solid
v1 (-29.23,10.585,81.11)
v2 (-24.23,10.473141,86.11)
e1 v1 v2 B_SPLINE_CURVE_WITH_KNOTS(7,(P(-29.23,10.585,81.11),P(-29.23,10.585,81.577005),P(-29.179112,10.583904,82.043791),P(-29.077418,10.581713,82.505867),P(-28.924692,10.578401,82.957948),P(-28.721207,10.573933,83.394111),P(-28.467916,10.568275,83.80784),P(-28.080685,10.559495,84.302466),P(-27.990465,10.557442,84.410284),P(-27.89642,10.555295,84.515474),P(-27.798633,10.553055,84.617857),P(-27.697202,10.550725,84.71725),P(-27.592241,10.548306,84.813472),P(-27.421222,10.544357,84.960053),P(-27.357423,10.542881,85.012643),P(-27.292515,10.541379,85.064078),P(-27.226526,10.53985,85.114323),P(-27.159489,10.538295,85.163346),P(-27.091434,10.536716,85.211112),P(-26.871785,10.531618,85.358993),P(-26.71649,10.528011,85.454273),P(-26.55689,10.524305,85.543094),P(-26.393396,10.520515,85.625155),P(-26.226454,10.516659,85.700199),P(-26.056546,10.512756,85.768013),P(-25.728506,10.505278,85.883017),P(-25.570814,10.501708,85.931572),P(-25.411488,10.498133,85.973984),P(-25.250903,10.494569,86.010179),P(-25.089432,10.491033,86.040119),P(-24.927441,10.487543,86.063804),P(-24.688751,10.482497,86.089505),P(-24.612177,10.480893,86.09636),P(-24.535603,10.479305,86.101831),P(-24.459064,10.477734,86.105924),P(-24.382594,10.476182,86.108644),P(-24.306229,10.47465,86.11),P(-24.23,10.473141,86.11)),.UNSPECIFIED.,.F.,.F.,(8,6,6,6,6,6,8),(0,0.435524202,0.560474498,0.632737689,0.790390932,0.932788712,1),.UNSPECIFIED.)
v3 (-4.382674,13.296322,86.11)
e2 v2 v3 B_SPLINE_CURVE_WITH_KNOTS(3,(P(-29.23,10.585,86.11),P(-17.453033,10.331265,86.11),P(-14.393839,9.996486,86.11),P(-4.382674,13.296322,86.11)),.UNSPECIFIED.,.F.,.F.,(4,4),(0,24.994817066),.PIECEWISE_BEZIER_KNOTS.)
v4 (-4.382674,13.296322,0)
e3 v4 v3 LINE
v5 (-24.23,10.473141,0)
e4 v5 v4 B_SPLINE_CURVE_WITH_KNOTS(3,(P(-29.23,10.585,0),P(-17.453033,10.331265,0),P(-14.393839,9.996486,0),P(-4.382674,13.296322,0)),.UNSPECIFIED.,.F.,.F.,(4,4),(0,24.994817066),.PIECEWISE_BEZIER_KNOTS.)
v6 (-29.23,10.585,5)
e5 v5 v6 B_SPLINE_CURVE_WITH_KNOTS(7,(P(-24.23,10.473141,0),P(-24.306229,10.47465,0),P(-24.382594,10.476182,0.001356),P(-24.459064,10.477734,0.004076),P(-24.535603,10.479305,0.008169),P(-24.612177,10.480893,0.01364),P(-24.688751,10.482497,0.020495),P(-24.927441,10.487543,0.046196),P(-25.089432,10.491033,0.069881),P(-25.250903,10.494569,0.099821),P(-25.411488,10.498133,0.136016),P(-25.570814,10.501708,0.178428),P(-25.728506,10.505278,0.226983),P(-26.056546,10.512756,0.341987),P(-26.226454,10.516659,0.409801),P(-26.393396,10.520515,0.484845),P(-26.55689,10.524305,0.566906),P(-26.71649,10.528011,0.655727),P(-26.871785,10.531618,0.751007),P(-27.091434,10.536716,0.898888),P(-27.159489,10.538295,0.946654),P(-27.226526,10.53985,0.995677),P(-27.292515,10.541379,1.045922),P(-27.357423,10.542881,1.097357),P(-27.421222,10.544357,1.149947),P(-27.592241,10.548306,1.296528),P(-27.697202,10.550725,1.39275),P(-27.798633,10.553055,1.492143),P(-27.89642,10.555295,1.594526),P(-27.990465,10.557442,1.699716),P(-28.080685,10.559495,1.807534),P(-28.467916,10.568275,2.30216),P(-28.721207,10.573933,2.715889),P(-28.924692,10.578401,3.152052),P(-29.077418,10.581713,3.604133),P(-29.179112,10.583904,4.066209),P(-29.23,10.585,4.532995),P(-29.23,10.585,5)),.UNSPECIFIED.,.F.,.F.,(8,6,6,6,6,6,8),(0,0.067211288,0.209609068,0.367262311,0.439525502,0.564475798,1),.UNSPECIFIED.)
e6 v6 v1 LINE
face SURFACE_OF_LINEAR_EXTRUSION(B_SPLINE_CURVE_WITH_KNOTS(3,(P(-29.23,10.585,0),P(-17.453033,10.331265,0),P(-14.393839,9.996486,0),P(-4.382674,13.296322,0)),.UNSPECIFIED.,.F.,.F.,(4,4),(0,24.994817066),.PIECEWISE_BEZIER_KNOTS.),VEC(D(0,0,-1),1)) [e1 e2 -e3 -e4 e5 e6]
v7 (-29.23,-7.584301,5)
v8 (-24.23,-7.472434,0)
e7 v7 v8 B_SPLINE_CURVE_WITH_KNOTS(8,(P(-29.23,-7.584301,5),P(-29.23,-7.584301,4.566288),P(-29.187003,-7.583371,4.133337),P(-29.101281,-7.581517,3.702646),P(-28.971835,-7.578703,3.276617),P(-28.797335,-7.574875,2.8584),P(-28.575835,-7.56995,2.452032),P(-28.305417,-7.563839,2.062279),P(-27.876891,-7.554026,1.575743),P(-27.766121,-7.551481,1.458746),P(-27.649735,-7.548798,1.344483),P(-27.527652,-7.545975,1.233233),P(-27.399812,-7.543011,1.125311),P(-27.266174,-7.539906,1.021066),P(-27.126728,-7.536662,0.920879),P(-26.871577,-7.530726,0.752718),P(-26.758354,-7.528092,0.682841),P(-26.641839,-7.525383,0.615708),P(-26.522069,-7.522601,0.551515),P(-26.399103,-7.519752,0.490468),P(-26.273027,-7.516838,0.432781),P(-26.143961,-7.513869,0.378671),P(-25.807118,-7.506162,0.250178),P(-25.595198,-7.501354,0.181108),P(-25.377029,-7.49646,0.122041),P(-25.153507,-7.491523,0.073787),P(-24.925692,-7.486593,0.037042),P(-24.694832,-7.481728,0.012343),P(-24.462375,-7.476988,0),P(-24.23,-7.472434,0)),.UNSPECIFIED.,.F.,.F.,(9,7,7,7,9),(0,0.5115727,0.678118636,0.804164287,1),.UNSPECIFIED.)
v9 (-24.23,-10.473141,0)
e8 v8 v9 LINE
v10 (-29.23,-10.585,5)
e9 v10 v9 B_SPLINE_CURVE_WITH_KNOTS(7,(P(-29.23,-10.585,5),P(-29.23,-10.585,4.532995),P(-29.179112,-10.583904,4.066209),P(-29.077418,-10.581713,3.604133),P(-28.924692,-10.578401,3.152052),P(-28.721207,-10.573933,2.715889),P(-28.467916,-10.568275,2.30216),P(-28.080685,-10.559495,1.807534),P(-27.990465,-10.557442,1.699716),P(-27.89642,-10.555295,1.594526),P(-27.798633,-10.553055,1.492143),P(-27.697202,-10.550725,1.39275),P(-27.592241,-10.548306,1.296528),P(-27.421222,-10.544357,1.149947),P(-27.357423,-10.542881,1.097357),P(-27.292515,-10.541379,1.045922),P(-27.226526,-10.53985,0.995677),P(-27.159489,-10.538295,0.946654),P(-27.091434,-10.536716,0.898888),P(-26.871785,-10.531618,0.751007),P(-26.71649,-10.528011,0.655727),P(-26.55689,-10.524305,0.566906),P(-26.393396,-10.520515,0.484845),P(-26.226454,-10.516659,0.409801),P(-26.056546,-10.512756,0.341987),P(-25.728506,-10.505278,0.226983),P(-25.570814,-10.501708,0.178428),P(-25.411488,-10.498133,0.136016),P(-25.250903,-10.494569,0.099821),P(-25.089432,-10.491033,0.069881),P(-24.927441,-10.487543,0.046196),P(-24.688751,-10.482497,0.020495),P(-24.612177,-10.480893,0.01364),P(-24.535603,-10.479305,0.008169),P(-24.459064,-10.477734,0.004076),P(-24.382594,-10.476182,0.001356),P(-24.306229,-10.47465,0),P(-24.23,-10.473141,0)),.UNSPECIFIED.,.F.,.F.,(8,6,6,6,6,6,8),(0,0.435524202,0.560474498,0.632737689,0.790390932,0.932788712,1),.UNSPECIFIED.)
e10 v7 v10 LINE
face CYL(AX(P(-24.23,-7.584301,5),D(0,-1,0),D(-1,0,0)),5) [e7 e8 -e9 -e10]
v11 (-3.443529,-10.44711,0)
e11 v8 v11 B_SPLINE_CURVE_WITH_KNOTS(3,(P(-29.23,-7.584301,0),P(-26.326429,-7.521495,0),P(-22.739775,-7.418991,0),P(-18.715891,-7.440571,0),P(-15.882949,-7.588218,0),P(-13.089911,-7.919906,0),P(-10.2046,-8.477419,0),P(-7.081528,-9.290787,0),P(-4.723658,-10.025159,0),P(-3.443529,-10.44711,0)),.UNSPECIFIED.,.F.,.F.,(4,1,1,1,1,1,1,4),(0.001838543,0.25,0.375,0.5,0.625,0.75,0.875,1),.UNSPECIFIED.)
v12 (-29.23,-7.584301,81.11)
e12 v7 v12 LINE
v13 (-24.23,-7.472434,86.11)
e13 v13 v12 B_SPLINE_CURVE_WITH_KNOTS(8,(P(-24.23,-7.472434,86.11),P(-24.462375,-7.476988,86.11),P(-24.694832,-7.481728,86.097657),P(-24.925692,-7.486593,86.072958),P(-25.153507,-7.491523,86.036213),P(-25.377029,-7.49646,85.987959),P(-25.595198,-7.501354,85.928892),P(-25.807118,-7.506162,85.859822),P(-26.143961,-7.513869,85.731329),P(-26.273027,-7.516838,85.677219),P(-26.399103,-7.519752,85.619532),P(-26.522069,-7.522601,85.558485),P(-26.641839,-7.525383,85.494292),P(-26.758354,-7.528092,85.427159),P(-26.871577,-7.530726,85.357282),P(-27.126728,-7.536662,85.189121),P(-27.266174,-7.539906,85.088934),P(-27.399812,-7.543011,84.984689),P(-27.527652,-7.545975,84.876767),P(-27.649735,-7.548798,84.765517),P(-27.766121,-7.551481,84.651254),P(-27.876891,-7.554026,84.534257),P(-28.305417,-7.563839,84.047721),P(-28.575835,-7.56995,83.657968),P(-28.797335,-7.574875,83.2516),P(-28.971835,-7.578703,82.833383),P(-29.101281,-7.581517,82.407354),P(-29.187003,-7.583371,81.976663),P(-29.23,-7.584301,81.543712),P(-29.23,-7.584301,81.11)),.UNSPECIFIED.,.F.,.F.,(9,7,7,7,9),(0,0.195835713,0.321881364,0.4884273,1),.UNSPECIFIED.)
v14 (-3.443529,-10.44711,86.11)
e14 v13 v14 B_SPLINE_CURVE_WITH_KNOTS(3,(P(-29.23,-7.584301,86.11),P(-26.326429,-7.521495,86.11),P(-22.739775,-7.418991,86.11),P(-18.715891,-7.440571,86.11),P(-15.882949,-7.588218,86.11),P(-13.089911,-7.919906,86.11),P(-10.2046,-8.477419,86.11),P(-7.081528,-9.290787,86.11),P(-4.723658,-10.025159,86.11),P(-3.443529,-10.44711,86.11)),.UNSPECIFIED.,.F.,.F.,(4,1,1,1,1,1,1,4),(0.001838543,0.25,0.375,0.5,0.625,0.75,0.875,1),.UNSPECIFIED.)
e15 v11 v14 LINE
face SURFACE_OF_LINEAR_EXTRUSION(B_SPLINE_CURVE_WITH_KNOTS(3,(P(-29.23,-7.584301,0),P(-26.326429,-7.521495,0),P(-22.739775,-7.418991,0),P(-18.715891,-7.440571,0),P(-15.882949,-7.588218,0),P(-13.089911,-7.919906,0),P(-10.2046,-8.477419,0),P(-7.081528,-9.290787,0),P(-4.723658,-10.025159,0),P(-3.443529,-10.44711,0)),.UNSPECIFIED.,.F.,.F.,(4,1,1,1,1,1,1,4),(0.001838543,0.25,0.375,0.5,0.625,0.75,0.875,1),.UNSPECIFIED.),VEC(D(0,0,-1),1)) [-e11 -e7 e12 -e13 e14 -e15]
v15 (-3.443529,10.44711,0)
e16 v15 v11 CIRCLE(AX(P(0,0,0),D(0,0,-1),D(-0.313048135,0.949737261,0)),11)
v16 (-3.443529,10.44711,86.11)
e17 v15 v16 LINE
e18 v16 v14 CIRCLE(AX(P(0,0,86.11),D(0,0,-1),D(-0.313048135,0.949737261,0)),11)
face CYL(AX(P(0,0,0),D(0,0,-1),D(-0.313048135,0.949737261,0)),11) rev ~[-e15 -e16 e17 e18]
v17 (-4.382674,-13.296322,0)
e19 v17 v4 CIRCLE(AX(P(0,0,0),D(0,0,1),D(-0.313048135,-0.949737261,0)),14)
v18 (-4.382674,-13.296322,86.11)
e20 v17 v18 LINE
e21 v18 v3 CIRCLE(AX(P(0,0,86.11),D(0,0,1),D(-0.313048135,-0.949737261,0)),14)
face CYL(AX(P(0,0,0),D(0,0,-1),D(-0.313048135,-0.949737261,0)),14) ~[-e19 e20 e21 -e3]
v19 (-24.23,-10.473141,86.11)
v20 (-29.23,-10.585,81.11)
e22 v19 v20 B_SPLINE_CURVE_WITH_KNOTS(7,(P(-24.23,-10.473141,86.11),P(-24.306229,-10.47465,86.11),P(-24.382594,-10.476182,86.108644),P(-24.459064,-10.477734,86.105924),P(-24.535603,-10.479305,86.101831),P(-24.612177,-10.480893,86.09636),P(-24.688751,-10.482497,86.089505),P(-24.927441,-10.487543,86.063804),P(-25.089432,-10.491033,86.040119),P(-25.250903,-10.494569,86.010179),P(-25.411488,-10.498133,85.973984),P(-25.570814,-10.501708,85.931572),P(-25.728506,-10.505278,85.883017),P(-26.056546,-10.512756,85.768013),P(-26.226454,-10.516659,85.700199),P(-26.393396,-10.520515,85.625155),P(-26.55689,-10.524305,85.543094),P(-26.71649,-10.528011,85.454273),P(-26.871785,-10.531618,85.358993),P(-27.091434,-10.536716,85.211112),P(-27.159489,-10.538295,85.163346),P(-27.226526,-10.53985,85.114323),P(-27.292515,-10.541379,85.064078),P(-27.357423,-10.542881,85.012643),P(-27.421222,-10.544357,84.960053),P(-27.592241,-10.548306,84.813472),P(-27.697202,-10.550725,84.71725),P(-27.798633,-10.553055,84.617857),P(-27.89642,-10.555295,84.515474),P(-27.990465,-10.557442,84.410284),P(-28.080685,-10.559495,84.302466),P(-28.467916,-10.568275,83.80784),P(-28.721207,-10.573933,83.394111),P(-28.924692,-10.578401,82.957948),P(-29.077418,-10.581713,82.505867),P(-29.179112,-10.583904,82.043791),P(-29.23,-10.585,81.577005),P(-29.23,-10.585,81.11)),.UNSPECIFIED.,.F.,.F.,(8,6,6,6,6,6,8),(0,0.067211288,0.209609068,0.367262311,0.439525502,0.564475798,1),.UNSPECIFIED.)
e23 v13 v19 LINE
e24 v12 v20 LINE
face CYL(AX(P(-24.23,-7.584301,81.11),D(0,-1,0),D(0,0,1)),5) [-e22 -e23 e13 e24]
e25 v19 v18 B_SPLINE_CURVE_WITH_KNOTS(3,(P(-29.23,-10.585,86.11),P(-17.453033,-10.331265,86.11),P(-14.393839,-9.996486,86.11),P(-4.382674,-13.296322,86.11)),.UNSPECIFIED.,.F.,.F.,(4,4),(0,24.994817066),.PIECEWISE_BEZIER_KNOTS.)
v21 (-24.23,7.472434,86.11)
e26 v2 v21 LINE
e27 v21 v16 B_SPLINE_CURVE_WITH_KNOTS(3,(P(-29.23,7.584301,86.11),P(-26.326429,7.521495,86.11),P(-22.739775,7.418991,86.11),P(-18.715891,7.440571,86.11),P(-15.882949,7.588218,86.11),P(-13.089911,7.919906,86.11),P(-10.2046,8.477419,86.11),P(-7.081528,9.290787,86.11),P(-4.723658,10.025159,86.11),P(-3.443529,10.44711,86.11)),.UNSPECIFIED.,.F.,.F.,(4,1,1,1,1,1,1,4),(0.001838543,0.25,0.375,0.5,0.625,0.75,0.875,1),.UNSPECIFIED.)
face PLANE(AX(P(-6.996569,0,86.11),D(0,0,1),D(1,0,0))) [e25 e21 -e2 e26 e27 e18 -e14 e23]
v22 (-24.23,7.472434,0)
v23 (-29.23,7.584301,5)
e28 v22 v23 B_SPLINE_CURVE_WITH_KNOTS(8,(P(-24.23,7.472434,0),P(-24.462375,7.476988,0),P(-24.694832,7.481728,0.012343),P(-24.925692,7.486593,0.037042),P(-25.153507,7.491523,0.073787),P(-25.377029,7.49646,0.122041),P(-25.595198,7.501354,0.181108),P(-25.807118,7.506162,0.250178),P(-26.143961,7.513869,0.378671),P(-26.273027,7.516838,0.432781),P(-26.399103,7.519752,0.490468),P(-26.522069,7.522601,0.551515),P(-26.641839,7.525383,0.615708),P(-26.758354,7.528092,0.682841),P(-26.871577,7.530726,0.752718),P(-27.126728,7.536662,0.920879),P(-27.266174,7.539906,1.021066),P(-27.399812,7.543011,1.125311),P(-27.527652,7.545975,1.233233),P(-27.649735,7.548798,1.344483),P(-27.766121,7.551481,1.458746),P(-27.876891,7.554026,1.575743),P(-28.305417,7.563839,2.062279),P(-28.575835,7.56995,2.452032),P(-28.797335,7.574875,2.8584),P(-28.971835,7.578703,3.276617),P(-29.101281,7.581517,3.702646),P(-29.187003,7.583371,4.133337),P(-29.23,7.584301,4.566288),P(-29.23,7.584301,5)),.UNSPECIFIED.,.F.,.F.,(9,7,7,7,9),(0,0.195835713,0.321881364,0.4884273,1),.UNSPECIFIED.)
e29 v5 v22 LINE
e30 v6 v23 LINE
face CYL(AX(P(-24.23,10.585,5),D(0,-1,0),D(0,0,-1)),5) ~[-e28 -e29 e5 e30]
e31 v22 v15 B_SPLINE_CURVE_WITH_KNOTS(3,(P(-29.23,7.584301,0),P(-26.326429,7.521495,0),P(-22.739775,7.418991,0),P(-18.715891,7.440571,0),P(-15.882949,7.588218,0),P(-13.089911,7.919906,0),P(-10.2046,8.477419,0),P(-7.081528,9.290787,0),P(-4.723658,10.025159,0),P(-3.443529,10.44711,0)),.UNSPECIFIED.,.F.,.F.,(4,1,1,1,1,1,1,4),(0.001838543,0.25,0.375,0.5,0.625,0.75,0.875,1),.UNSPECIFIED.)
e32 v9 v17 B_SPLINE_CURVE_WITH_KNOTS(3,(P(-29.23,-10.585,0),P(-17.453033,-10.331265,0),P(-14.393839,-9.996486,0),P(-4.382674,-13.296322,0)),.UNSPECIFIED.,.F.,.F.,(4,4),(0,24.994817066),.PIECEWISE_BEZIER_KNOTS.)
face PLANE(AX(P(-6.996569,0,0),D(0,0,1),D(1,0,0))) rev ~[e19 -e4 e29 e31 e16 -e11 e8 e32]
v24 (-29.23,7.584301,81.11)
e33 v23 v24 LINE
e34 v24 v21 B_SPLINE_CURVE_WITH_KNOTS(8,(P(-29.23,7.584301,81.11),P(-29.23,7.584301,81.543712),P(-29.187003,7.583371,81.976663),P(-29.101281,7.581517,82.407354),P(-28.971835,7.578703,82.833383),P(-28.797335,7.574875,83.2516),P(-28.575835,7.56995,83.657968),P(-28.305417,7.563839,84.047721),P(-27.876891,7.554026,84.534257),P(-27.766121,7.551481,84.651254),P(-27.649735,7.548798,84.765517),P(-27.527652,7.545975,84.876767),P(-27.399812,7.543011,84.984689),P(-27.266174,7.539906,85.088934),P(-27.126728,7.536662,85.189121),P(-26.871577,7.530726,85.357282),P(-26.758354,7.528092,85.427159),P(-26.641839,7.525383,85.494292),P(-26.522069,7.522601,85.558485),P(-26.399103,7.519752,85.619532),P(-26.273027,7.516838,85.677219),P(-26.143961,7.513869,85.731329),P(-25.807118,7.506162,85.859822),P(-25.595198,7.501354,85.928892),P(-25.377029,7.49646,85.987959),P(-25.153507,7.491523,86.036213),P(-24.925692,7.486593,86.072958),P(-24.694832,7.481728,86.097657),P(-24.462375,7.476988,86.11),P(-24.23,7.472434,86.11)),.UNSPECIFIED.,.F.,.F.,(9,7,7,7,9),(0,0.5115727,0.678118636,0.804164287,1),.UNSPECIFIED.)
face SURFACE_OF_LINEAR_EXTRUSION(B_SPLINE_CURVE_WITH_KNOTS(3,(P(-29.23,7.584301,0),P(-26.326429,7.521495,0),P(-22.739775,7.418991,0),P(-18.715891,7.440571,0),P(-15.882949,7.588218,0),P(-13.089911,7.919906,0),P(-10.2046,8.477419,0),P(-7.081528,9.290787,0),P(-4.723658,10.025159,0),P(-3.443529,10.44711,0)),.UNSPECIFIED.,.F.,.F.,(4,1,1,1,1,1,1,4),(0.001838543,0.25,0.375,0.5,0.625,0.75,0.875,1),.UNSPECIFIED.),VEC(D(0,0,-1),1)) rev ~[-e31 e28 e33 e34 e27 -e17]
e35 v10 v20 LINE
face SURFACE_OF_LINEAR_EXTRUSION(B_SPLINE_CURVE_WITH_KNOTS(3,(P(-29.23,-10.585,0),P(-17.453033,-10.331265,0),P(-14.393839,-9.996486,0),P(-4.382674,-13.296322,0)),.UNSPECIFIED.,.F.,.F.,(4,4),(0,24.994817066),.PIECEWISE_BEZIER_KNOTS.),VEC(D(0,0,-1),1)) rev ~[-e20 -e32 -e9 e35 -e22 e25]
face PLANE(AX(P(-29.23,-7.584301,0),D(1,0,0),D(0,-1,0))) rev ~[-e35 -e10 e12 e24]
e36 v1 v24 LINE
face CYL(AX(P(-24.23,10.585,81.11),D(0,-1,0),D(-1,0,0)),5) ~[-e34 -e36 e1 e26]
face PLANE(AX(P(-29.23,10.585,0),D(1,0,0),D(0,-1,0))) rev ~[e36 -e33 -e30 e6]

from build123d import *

# Parameters (mm, degrees)
F1_DEPTH = 86.11
F2_R     = 5
F3_R     = 5
F4_R     = 5


# Not quite as in the source:
# - the dataset's text gives a spline's control points without its knots; the knots are read off the source's solid


with BuildPart() as f1:
    # F0 (on Top) → F1 (new body)
    with BuildSketch(Plane.XY):
        with BuildLine():
            add(Edge.make_bspline(
                [(-29.23, -10.585), (-17.4530325989, -10.3312646709), (-14.3938385965, -9.9964864644), (-4.3826738853, -13.2963216573)],
                knots=[0, 0, 0, 0, 24.9948170664, 24.9948170664, 24.9948170664, 24.9948170664], degree=3))
            ThreePointArc((-4.3826738853, -13.2963216573), (14, 0), (-4.3826738853, 13.2963216573))
            add(Edge.make_bspline(
                [(-29.23, 10.585), (-17.4530325989, 10.3312646709), (-14.3938385965, 9.9964864644), (-4.3826738853, 13.2963216573)],
                knots=[0, 0, 0, 0, 24.9948170664, 24.9948170664, 24.9948170664, 24.9948170664], degree=3))
            Line((-29.23, 10.585), (-29.23, 7.5843010349))
            add(Edge.make_bspline(
                [(-29.2300000018, 7.5843009524), (-26.3264289999, 7.5214949579), (-22.7397747479, 7.4189906626), (-18.7158912708, 7.4405712538), (-15.8829489535, 7.5882179461), (-13.0899113875, 7.919906296), (-10.2045998481, 8.4774191522), (-7.0815280556, 9.2907869197), (-4.7236583696, 10.0251594583), (-3.443529459, 10.447109806)],
                knots=[0.0018385431, 0.0018385431, 0.0018385431, 0.0018385431, 0.25, 0.375, 0.5, 0.625, 0.75, 0.875, 1, 1, 1, 1], degree=3))
            ThreePointArc((-3.443529459, 10.447109806), (10.9999999288, 0), (-3.443529459, -10.447109806))
            add(Edge.make_bspline(
                [(-29.2300000018, -7.5843009524), (-26.3264289999, -7.5214949579), (-22.7397747479, -7.4189906626), (-18.7158912708, -7.4405712538), (-15.8829489535, -7.5882179461), (-13.0899113875, -7.919906296), (-10.2045998481, -8.4774191522), (-7.0815280556, -9.2907869197), (-4.7236583696, -10.0251594583), (-3.443529459, -10.447109806)],
                knots=[0.0018385431, 0.0018385431, 0.0018385431, 0.0018385431, 0.25, 0.375, 0.5, 0.625, 0.75, 0.875, 1, 1, 1, 1], degree=3))
            Line((-29.23, -7.5843010349), (-29.23, -10.585))
        make_face()
    extrude(amount=F1_DEPTH)

    # F2
    f2_edges = [f1.edges().sort_by_distance(p)[0] for p in [
        (-29.23, -9.084651, 0),
    ]]
    fillet(f2_edges, radius=F2_R)

    # F3
    f3_edges = [f1.edges().sort_by_distance(p)[0] for p in [
        (-29.23, 9.084651, 0),
    ]]
    fillet(f3_edges, radius=F3_R)

    # F4
    f4_edges = [f1.edges().sort_by_distance(p)[0] for p in [
        (-29.23, -9.084651, 86.11),
        (-29.23, 9.084651, 86.11),
    ]]
    fillet(f4_edges, radius=F4_R)


solid = f1.part
